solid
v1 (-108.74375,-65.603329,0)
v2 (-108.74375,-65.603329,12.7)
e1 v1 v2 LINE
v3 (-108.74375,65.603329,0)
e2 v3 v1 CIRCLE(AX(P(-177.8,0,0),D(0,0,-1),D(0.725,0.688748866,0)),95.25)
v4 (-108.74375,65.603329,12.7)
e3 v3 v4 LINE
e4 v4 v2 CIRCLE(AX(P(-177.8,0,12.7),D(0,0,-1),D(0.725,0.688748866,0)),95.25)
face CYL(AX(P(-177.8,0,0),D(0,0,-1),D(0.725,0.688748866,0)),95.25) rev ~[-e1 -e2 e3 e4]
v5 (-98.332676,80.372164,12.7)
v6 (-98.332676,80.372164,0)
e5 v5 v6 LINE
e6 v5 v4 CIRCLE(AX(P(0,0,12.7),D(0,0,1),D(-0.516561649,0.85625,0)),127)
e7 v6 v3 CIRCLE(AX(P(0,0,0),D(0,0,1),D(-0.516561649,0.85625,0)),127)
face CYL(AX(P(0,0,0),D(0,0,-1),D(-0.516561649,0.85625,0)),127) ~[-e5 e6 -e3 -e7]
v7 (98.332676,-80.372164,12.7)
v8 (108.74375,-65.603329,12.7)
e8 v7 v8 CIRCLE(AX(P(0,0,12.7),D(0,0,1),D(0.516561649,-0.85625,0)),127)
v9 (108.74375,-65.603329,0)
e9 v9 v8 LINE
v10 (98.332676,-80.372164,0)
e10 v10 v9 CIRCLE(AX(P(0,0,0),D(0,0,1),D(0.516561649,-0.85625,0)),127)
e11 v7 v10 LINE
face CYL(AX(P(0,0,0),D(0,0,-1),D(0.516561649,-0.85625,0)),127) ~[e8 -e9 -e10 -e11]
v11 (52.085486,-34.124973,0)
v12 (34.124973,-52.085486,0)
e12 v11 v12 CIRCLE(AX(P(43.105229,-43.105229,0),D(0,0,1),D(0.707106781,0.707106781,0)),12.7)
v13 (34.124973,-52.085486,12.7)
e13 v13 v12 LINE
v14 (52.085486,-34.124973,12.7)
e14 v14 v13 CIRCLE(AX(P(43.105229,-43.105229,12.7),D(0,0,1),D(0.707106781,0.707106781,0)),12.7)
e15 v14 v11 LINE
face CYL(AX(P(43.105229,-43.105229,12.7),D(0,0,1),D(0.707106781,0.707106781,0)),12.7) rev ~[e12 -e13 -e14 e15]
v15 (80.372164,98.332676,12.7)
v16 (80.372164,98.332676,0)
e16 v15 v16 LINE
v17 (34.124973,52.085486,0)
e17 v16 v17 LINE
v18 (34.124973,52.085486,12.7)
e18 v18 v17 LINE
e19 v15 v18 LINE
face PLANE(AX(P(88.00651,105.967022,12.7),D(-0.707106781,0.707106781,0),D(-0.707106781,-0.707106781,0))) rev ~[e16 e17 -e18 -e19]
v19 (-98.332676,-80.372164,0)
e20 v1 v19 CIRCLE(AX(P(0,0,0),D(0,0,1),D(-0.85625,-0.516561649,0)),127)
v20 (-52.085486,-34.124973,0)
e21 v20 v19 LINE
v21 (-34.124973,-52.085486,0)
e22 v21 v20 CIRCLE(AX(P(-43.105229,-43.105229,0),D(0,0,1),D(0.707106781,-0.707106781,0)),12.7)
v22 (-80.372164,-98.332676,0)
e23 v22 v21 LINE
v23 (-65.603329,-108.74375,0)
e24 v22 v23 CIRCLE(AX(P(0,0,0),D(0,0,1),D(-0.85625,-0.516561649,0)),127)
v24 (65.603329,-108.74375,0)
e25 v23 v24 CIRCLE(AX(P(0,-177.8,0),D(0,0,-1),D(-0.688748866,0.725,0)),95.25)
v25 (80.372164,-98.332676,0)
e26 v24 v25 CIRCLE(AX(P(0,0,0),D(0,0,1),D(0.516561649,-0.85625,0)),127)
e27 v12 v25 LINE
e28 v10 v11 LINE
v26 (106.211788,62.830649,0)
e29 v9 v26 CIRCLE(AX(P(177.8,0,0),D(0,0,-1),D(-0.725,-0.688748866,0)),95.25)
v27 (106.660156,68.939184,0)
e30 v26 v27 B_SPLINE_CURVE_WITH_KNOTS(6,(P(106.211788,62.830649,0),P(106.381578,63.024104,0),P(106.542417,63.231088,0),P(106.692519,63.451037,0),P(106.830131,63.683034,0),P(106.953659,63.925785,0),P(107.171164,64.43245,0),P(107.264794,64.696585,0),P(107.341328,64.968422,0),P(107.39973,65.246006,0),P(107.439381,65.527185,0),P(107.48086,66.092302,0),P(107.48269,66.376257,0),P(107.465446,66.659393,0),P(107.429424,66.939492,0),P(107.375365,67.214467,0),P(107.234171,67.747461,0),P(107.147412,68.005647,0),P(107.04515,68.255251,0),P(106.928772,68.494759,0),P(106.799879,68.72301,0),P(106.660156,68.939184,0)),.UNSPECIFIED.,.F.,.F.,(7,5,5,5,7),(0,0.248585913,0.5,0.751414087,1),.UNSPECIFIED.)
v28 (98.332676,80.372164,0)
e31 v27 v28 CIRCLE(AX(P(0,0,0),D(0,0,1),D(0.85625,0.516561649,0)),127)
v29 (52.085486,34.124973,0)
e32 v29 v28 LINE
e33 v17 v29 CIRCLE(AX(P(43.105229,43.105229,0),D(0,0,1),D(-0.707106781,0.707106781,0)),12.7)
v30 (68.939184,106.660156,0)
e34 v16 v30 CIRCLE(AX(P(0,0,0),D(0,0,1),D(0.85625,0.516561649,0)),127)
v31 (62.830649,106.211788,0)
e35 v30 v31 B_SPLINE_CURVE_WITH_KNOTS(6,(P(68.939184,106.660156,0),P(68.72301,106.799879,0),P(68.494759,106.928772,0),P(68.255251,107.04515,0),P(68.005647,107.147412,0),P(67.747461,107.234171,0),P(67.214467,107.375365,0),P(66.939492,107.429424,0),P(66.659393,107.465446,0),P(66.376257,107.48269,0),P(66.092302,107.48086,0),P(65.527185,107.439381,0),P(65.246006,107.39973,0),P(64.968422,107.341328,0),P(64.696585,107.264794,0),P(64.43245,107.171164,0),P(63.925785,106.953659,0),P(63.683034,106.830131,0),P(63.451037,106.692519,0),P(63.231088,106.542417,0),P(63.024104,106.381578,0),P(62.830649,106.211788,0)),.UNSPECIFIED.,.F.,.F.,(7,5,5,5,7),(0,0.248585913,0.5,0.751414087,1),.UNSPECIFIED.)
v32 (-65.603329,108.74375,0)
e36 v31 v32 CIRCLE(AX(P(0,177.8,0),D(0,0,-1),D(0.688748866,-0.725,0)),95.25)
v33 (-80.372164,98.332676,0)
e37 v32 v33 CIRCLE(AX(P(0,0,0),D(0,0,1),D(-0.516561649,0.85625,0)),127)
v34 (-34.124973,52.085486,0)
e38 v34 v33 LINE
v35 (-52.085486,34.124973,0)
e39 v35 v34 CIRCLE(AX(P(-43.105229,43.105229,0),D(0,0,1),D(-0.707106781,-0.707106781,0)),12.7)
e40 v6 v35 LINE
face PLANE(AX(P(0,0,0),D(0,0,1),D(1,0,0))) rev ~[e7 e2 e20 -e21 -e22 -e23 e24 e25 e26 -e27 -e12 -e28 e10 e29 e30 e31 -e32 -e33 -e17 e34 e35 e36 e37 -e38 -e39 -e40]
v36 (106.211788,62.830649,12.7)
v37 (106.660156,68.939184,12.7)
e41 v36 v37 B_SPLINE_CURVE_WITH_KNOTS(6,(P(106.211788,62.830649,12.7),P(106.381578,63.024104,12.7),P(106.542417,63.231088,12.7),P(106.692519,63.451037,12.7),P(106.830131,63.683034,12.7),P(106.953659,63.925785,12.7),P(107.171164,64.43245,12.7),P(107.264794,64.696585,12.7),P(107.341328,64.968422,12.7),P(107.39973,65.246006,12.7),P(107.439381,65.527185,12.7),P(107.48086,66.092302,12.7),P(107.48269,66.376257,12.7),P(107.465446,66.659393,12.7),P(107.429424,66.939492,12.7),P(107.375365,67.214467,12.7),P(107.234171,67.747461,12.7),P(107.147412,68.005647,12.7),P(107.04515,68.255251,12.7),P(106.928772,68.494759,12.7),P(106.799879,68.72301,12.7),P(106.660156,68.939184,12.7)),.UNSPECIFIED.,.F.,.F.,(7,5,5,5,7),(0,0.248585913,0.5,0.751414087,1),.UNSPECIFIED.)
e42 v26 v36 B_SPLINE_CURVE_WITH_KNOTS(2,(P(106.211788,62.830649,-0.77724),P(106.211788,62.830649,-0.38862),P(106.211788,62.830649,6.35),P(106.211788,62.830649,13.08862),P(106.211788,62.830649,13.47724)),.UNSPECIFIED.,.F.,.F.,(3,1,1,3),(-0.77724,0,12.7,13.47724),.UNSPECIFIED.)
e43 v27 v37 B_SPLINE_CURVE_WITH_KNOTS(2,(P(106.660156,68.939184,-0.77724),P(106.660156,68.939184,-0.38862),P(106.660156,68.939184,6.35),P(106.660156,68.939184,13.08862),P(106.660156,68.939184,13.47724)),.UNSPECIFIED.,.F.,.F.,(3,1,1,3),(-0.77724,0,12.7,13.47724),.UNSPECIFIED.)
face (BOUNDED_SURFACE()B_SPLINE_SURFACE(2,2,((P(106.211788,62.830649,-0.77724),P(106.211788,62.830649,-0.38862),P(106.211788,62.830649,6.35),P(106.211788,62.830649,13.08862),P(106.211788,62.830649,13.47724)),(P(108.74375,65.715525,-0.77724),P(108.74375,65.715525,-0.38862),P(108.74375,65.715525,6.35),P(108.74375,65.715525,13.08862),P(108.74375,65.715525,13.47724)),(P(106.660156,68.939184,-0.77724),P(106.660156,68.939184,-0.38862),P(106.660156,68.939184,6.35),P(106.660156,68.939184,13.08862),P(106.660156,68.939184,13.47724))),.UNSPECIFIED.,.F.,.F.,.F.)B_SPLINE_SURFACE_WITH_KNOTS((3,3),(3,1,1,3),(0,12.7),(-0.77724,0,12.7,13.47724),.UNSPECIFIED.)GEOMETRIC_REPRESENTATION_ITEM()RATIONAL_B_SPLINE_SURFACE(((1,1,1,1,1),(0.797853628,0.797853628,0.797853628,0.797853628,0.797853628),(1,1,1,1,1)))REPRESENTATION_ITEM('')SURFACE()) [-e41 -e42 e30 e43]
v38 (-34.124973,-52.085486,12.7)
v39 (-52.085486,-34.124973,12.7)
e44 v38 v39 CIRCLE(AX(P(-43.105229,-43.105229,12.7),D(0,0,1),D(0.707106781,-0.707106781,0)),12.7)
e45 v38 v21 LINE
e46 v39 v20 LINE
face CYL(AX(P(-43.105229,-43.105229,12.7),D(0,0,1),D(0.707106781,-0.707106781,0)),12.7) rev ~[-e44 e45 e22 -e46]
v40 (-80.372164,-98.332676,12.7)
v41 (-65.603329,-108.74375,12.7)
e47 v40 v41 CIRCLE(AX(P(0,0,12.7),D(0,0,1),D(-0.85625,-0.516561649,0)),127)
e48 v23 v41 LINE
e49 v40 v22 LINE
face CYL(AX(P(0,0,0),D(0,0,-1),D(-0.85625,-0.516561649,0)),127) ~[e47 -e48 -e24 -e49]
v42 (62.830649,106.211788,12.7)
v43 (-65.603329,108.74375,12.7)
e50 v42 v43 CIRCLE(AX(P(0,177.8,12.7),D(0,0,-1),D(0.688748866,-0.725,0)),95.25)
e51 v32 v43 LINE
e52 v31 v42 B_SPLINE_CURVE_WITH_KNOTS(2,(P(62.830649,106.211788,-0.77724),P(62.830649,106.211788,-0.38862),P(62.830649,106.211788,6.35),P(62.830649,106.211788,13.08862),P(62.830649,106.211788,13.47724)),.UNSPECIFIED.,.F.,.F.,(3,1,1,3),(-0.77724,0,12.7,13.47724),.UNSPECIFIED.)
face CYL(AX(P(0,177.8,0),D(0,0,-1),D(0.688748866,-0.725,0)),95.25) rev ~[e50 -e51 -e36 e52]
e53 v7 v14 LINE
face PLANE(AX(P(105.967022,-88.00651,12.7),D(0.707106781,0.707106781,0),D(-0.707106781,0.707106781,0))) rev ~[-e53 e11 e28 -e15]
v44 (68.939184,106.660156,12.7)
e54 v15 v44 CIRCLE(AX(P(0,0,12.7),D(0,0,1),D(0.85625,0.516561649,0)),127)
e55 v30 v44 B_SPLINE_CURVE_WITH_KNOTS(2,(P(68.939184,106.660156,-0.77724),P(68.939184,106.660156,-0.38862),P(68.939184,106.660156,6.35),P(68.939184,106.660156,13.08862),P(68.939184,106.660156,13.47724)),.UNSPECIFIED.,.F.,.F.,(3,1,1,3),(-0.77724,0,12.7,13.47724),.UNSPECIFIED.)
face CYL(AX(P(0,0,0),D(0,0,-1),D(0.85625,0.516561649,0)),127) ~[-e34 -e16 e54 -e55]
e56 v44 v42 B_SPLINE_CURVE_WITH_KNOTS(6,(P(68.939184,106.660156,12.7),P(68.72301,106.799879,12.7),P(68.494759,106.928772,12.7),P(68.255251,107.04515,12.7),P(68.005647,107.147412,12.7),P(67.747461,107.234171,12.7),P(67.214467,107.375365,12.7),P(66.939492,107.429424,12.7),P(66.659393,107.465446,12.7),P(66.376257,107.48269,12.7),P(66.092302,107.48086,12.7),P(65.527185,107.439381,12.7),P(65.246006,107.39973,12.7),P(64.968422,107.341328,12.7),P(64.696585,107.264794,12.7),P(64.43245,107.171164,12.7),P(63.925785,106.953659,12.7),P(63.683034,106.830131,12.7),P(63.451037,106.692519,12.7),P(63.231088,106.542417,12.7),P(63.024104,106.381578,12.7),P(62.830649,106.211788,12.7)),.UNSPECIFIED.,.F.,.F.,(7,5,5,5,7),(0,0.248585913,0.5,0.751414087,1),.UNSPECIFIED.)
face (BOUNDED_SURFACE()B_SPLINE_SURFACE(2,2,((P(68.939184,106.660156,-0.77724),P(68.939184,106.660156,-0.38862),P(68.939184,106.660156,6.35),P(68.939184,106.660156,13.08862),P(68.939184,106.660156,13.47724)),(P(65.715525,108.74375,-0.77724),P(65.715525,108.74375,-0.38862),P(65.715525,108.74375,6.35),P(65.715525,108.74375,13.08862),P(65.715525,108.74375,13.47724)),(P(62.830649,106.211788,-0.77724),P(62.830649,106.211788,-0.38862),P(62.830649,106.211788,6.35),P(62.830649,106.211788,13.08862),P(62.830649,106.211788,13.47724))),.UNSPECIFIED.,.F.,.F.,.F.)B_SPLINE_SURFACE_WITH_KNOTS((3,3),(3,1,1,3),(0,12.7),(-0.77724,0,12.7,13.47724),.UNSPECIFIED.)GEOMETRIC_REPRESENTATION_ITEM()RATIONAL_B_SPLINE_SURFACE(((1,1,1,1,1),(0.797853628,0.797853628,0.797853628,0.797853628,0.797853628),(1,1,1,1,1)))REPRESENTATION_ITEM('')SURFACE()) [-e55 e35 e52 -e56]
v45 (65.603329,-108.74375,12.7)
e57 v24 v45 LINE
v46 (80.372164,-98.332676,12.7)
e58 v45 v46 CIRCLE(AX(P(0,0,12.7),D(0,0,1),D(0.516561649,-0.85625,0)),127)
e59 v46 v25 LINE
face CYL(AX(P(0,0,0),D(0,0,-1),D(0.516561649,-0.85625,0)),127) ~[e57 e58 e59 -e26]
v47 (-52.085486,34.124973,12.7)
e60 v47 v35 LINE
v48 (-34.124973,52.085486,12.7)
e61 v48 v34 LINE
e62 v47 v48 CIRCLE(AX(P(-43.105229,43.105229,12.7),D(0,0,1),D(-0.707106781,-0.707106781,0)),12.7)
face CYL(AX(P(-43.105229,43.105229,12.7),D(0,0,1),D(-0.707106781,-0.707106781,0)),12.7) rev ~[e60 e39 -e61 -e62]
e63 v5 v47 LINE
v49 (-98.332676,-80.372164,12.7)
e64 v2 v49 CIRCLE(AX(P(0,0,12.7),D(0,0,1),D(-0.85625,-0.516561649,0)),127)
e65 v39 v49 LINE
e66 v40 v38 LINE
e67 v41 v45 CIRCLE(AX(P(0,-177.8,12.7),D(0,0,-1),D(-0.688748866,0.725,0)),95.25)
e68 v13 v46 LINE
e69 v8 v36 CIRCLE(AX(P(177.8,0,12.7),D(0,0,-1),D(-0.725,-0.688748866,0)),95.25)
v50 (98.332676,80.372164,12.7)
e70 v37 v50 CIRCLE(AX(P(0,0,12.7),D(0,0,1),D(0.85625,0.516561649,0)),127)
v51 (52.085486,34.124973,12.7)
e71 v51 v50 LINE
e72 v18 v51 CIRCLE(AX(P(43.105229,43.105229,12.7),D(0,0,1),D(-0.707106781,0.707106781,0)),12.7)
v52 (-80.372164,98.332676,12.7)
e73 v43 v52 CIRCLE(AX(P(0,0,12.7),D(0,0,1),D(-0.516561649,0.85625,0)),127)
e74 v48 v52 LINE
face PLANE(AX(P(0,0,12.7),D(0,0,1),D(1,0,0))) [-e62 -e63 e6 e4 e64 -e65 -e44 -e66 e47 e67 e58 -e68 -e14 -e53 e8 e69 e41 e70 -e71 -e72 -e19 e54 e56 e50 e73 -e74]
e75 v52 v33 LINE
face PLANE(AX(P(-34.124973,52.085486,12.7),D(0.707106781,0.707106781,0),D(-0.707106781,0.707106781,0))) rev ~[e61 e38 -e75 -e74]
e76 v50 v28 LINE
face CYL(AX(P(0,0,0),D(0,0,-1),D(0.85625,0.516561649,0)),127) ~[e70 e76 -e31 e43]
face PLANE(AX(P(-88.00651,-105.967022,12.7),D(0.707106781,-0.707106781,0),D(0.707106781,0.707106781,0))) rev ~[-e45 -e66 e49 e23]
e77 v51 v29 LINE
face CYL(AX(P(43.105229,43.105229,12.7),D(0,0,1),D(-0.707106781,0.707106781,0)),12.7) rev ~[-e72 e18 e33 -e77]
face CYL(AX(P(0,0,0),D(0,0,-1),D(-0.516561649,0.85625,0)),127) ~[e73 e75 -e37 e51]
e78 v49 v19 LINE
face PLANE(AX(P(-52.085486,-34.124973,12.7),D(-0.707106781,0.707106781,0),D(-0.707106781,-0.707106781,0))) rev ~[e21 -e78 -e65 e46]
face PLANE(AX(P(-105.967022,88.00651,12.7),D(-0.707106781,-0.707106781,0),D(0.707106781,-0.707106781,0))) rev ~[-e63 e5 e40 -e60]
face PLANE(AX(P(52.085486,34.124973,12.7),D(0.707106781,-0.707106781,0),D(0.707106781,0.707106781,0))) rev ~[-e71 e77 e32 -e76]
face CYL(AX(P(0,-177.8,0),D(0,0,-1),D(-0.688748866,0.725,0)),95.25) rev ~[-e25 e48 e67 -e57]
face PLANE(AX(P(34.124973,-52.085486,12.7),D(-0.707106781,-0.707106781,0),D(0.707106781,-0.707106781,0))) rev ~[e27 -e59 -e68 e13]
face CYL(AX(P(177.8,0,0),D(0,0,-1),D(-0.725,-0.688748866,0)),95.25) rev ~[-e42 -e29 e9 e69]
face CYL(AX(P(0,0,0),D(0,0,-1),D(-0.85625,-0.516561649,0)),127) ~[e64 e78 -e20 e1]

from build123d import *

# Parameters (mm, degrees)
F1_DEPTH = 12.7
F3_R     = 5.08
F4_DEPTH = 25.4


with BuildPart() as f1:
    # F0 (on Top) → F1 (new body)
    with BuildSketch(Plane.XY):
        with BuildLine():
            ThreePointArc((108.74375, -65.6033294577), (82.55, 0), (108.74375, 65.6033294577))
            ThreePointArc((108.74375, 65.6033294577), (89.8025612107, 89.8025612107), (65.6033294577, 108.74375))
            ThreePointArc((65.6033294577, 108.74375), (0, 82.55), (-65.6033294577, 108.74375))
            ThreePointArc((-65.6033294577, 108.74375), (-89.8025612107, 89.8025612107), (-108.74375, 65.6033294577))
            ThreePointArc((-108.74375, 65.6033294577), (-82.55, 0), (-108.74375, -65.6033294577))
            ThreePointArc((-108.74375, -65.6033294577), (-89.8025612107, -89.8025612107), (-65.6033294577, -108.74375))
            ThreePointArc((-65.6033294577, -108.74375), (0, -82.55), (65.6033294577, -108.74375))
            ThreePointArc((65.6033294577, -108.74375), (89.8025612107, -89.8025612107), (108.74375, -65.6033294577))
        make_face()
    extrude(amount=F1_DEPTH)

    # F3
    f3_edges = [f1.edges().sort_by_distance(p)[0] for p in [
        (65.603329, 108.74375, 6.35),
        (108.74375, 65.603329, 6.35),
    ]]
    fillet(f3_edges, radius=F3_R)

    # F2 (on face) → F4 (cut)
    with BuildSketch(Plane.XY.offset(12.7)):
        with BuildLine():
            Line((105.9670222286, 88.0065099865), (96.9867661075, 96.9867661075))
            Line((96.9867661075, 96.9867661075), (88.0065099865, 105.9670222286))
            Line((88.0065099865, 105.9670222286), (34.1249732601, 52.0854855022))
            ThreePointArc((34.1249732601, 52.0854855022), (34.1249732601, 34.1249732601), (52.0854855022, 34.1249732601))
            Line((52.0854855022, 34.1249732601), (105.9670222286, 88.0065099865))
        make_face()
        with BuildLine():
            ThreePointArc((-52.0854855022, 34.1249732601), (-34.1249732601, 34.1249732601), (-34.1249732601, 52.0854855022))
            Line((-34.1249732601, 52.0854855022), (-88.0065099865, 105.9670222286))
            Line((-88.0065099865, 105.9670222286), (-96.9867661075, 96.9867661075))
            Line((-96.9867661075, 96.9867661075), (-105.9670222286, 88.0065099865))
            Line((-105.9670222286, 88.0065099865), (-52.0854855022, 34.1249732601))
        make_face()
        with BuildLine():
            Line((-88.0065099865, -105.9670222286), (-34.1249732601, -52.0854855022))
            ThreePointArc((-34.1249732601, -52.0854855022), (-34.1249732601, -34.1249732601), (-52.0854855022, -34.1249732601))
            Line((-52.0854855022, -34.1249732601), (-105.9670222286, -88.0065099865))
            Line((-105.9670222286, -88.0065099865), (-96.9867661075, -96.9867661075))
            Line((-96.9867661075, -96.9867661075), (-88.0065099865, -105.9670222286))
        make_face()
        with BuildLine():
            Line((34.1249732601, -52.0854855022), (88.0065099865, -105.9670222286))
            Line((88.0065099865, -105.9670222286), (96.9867661075, -96.9867661075))
            Line((96.9867661075, -96.9867661075), (105.9670222286, -88.0065099865))
            Line((105.9670222286, -88.0065099865), (52.0854855022, -34.1249732601))
            ThreePointArc((52.0854855022, -34.1249732601), (34.1249732601, -34.1249732601), (34.1249732601, -52.0854855022))
        make_face()
    extrude(amount=-F4_DEPTH, mode=Mode.SUBTRACT)


solid = f1.part
